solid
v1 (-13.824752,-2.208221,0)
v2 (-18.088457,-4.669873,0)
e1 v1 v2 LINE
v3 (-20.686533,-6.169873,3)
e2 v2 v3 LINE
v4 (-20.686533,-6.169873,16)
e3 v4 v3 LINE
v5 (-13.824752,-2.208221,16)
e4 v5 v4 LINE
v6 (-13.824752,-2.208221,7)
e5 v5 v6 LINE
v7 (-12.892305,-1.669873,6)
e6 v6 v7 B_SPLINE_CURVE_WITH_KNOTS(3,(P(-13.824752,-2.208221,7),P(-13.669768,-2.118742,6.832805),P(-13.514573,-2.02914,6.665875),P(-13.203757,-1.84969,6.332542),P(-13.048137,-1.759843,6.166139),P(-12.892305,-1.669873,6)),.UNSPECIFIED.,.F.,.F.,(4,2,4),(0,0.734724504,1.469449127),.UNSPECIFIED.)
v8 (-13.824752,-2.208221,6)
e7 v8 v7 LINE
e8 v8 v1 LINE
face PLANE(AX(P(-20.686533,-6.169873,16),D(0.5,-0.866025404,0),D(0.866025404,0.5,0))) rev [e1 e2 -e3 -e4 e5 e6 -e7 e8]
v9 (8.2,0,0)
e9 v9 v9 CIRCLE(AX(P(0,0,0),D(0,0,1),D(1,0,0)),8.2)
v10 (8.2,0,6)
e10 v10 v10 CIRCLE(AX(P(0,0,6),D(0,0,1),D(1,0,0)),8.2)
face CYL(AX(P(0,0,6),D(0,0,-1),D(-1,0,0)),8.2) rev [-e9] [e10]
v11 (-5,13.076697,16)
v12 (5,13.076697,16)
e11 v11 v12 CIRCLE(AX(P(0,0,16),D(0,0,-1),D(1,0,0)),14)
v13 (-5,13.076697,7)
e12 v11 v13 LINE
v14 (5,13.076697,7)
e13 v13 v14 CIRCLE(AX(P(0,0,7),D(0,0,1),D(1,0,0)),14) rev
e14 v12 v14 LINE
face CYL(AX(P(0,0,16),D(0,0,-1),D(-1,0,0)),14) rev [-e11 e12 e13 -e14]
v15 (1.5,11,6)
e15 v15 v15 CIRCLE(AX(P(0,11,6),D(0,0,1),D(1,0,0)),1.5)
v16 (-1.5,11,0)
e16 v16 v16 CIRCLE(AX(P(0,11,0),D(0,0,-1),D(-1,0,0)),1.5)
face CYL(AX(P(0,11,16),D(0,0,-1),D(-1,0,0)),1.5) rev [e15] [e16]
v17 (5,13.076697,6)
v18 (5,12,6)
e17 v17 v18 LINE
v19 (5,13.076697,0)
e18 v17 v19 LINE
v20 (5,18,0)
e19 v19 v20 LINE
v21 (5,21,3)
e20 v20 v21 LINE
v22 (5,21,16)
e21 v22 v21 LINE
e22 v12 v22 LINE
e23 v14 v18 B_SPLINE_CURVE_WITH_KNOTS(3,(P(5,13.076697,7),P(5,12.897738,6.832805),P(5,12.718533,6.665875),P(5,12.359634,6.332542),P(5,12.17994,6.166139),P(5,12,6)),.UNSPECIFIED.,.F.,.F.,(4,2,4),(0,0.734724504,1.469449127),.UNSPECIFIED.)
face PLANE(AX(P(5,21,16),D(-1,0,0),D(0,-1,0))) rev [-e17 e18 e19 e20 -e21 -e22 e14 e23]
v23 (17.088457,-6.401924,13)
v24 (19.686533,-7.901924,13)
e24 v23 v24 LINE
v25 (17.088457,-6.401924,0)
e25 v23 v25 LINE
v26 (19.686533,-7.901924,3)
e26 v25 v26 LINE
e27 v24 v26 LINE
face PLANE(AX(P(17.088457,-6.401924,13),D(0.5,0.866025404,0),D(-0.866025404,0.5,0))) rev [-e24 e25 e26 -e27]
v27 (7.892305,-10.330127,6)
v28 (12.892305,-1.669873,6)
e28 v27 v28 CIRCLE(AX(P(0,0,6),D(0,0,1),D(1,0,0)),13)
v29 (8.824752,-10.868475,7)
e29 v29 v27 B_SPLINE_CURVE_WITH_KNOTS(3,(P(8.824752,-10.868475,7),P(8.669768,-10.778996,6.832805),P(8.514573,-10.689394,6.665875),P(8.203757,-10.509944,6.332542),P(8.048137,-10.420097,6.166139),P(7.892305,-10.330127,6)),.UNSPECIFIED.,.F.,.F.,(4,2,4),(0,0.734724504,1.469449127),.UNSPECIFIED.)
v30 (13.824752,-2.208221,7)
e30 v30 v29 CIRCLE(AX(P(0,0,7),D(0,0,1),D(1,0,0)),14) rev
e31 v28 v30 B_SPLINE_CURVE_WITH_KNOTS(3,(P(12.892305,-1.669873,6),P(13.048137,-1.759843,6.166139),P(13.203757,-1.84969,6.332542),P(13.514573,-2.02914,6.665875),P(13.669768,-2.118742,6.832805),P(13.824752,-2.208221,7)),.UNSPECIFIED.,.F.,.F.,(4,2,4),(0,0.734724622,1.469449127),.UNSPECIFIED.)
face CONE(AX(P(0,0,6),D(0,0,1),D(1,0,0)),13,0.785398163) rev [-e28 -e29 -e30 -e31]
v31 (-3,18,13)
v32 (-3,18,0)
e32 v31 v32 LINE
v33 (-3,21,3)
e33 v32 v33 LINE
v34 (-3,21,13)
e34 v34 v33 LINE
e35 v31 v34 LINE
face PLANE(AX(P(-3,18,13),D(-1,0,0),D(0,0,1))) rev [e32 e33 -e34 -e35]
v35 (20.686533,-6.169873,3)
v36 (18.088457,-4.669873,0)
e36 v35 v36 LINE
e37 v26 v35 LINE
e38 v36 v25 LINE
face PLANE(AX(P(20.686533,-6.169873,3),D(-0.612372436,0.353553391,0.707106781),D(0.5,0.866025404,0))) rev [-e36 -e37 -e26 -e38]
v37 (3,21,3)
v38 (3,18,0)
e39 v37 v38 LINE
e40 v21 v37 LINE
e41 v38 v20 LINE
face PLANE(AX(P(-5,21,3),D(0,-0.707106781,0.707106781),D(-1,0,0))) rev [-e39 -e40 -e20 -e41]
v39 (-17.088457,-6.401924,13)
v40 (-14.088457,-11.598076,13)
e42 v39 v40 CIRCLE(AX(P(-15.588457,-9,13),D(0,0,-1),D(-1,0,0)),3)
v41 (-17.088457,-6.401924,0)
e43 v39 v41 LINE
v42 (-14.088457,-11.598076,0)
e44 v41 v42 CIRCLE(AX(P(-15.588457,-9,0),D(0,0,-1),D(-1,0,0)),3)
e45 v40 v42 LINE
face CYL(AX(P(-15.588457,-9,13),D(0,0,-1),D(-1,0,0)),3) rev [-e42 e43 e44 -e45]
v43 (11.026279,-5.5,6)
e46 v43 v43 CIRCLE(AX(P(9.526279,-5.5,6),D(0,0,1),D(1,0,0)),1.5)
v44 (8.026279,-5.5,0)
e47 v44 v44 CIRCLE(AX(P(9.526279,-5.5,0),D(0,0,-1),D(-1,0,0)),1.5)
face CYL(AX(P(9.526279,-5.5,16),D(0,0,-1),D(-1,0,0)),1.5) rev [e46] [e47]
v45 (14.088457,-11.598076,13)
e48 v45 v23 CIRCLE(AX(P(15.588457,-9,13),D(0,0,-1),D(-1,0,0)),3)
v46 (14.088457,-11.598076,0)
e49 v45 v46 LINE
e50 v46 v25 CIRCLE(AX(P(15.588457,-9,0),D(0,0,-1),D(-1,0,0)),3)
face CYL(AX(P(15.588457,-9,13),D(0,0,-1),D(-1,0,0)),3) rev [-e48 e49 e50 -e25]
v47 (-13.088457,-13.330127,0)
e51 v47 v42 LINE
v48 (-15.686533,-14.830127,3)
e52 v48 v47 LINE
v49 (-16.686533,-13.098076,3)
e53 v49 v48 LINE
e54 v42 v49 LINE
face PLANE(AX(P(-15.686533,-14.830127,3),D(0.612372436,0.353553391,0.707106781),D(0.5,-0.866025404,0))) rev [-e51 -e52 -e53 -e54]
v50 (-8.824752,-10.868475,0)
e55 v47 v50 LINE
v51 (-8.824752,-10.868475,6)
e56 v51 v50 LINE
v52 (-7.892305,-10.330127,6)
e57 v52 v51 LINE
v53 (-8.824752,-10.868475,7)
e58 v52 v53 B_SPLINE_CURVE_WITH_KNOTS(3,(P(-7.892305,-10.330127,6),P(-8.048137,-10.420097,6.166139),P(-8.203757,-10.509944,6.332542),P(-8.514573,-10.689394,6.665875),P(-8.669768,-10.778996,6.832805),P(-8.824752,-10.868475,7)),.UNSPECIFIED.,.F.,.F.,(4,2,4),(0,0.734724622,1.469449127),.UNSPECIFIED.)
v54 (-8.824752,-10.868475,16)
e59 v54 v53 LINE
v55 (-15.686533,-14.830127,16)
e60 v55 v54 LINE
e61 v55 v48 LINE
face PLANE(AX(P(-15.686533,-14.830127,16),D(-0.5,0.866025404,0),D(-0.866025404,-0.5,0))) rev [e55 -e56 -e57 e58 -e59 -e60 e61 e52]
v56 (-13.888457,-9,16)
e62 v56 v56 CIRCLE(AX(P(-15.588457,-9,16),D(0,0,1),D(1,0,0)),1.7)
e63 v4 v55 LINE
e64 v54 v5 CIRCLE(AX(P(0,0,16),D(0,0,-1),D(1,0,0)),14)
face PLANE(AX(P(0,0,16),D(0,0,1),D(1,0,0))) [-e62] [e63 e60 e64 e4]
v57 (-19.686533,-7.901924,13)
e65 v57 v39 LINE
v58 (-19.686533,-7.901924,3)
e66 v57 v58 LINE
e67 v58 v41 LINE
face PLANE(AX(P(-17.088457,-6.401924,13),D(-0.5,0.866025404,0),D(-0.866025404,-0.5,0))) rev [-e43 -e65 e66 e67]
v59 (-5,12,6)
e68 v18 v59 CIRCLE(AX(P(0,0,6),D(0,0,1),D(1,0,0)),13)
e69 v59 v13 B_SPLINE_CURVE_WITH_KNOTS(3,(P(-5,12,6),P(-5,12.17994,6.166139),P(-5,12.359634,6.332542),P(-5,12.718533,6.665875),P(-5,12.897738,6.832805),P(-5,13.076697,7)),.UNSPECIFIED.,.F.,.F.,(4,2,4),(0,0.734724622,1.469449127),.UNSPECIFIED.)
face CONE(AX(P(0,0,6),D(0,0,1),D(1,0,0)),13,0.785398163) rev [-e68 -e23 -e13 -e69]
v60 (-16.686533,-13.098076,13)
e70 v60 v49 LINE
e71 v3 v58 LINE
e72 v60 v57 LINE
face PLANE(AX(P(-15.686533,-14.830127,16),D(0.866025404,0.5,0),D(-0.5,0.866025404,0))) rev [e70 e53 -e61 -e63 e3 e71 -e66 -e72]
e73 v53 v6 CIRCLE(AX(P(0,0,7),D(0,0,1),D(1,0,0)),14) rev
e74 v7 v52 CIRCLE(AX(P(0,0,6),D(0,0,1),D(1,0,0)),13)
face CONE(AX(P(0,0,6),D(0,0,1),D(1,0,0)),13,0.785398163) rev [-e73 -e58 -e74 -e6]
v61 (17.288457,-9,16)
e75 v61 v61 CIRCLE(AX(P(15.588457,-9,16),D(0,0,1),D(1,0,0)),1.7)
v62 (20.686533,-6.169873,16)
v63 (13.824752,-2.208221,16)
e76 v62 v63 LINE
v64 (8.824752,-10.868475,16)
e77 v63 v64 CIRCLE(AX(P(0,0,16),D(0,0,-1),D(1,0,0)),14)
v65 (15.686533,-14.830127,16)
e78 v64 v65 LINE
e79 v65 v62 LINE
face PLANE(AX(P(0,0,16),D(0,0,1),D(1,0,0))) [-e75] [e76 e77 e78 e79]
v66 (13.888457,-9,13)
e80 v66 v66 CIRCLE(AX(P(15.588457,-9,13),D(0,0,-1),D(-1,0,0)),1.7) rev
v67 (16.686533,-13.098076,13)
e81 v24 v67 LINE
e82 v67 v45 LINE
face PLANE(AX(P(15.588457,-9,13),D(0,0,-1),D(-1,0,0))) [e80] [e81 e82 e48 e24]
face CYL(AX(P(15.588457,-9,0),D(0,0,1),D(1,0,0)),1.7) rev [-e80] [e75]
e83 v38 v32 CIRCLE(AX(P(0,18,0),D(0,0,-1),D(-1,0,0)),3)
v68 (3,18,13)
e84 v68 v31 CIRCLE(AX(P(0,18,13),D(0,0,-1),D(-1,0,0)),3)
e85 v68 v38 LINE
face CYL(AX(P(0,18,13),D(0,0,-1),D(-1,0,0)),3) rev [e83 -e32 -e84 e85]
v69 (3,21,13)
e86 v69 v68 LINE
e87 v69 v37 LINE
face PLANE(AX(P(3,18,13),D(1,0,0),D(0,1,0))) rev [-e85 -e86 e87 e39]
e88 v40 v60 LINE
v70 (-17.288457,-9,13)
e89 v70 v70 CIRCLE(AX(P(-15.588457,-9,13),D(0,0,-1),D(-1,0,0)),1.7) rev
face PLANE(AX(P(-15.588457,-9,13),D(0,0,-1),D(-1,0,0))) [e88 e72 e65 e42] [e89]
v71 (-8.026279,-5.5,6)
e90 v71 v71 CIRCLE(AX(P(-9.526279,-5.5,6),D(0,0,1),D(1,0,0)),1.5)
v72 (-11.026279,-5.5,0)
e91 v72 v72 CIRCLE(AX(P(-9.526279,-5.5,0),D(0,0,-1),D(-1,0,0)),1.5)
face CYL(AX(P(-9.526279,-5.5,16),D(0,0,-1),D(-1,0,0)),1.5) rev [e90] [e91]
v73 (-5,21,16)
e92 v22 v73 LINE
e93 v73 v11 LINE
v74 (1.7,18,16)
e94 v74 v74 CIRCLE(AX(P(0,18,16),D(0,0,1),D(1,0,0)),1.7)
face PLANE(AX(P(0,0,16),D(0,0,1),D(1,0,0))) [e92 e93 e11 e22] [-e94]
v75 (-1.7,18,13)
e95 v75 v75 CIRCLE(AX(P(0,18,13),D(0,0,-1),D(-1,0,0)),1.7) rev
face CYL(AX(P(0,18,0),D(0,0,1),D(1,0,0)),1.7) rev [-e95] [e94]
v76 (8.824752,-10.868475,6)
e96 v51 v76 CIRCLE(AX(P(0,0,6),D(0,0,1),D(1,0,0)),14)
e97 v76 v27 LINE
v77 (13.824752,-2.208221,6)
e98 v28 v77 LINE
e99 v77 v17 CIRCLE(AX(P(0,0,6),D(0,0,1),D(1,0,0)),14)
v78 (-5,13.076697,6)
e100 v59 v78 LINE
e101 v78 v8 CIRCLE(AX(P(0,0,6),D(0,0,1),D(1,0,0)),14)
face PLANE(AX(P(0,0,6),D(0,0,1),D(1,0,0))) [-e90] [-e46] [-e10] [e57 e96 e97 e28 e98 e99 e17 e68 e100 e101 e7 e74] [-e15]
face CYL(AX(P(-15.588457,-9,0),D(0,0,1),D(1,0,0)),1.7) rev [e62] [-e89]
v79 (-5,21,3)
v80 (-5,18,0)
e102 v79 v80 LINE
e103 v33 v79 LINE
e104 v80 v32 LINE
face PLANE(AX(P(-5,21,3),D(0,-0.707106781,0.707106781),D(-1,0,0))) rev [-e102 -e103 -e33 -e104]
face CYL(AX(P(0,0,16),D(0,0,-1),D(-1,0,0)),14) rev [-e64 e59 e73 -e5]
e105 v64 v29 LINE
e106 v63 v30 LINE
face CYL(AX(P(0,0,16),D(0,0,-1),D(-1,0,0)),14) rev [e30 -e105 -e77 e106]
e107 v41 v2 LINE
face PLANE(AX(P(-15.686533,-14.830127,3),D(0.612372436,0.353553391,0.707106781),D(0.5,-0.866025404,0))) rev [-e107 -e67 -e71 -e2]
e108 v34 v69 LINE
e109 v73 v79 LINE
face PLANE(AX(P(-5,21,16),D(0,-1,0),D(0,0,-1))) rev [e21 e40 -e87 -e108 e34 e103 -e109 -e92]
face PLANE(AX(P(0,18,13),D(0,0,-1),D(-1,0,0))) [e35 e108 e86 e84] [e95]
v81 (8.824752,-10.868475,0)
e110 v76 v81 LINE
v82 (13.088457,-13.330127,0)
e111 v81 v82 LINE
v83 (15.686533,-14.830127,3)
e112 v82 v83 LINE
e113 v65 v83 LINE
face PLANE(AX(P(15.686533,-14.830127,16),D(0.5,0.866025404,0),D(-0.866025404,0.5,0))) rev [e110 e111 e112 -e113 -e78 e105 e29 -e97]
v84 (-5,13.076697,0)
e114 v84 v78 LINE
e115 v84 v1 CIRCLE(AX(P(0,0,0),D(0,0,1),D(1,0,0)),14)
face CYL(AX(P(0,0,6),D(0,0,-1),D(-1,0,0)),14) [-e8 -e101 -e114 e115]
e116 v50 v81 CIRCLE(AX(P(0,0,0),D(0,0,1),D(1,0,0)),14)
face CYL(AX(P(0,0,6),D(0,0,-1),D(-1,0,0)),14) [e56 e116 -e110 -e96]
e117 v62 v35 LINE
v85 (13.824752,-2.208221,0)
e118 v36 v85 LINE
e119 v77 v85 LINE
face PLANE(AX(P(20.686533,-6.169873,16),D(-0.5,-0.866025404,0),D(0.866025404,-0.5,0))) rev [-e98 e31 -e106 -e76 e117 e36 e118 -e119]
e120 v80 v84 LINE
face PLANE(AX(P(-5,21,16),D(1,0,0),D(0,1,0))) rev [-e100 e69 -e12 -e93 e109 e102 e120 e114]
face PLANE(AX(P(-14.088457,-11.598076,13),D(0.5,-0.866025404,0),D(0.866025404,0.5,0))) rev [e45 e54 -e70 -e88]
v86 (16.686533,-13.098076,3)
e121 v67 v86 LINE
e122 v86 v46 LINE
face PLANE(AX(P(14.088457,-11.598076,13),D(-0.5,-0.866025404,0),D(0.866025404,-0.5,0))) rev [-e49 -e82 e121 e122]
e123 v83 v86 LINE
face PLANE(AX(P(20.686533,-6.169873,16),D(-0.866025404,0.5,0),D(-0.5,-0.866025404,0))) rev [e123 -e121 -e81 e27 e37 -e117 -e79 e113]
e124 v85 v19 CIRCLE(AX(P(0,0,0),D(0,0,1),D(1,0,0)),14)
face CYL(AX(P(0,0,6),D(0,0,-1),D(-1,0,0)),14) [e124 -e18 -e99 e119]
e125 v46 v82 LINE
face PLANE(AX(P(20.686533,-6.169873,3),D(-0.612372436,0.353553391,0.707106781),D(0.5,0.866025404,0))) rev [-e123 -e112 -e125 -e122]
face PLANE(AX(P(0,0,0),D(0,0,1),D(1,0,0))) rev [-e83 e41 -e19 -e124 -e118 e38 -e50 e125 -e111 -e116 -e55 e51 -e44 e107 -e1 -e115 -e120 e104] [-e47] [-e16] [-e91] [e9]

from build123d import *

# Parameters (mm, degrees)
SKETCH_1_R          = 14
SKETCH_1_R_2        = 8.2
EXTRUDE_1_DEPTH     = 6
EXTRUDE_2_DEPTH     = 16
SKETCH_3_R          = 1.7
CUT_EXTRUDE_1_DEPTH = 34.540015912
SKETCH_4_R          = 1.5
CUT_EXTRUDE_2_DEPTH = 34.540015912
CUT_EXTRUDE_3_DEPTH = 13
CHAMFER_1_SIZE      = 3
CHAMFER_2_SIZE      = 1


with BuildPart() as part:
    # 草圖1 → 填料-伸長1 (new body)
    with BuildSketch(Plane.XY):
        Circle(SKETCH_1_R)
        Circle(SKETCH_1_R_2, mode=Mode.SUBTRACT)
    extrude(amount=EXTRUDE_1_DEPTH)

    # 草圖2 → 填料-伸長2 (add)
    with BuildSketch(Plane.XY):
        with BuildLine():
            Line((20.686533479, -6.169872981), (13.824751653, -2.208221396))
            ThreePointArc((13.824751653, -2.208221396), (12.124355653, -7), (8.824751653, -10.868475434))
            Line((8.824751653, -10.868475434), (15.686533479, -14.830127019))
            Line((15.686533479, -14.830127019), (20.686533479, -6.169872981))
        make_face()
        with BuildLine():
            Line((-5, 21), (5, 21))
            Line((5, 21), (5, 13.076696831))
            ThreePointArc((5, 13.076696831), (0, 14), (-5, 13.076696831))
            Line((-5, 13.076696831), (-5, 21))
        make_face()
        with BuildLine():
            Line((-15.686533479, -14.830127019), (-8.824751653, -10.868475434))
            ThreePointArc((-8.824751653, -10.868475434), (-12.124355653, -7), (-13.824751653, -2.208221396))
            Line((-13.824751653, -2.208221396), (-20.686533479, -6.169872981))
            Line((-20.686533479, -6.169872981), (-15.686533479, -14.830127019))
        make_face()
    extrude(amount=EXTRUDE_2_DEPTH)

    # 草圖3 → 除料-伸長1 (cut, through all)
    with BuildSketch(Plane.XY.offset(16)):
        with Locations((0, 18)):
            Circle(SKETCH_3_R)
        with Locations((15.588457268, -9)):
            Circle(SKETCH_3_R)
        with Locations((-15.588457268, -9)):
            Circle(SKETCH_3_R)
    extrude(amount=-CUT_EXTRUDE_1_DEPTH, mode=Mode.SUBTRACT)

    # 草圖4 → 除料-伸長2 (cut, through all)
    with BuildSketch(Plane(origin=(0, 0, 0), x_dir=(-1, 0, 0), z_dir=(0, 0, -1))):
        with Locations((0, 11)):
            Circle(SKETCH_4_R)
        with Locations((9.526279442, -5.5)):
            Circle(SKETCH_4_R)
        with Locations((-9.526279442, -5.5)):
            Circle(SKETCH_4_R)
    extrude(amount=-CUT_EXTRUDE_2_DEPTH, mode=Mode.SUBTRACT)

    # 草圖5 → 除料-伸長3 (cut)
    with BuildSketch(Plane(origin=(0, 0, 0), x_dir=(-1, 0, 0), z_dir=(0, 0, -1))):
        with BuildLine():
            Line((17.088457268, -6.401923789), (19.686533479, -7.901923789))
            Line((19.686533479, -7.901923789), (16.686533479, -13.098076211))
            Line((16.686533479, -13.098076211), (14.088457268, -11.598076211))
            ThreePointArc((14.088457268, -11.598076211), (12.990381057, -7.5), (17.088457268, -6.401923789))
        make_face()
        with BuildLine():
            Line((-3, 18), (-3, 21))
            Line((-3, 21), (3, 21))
            Line((3, 21), (3, 18))
            ThreePointArc((3, 18), (0, 15), (-3, 18))
        make_face()
        with BuildLine():
            Line((-14.088457268, -11.598076211), (-16.686533479, -13.098076211))
            Line((-16.686533479, -13.098076211), (-19.686533479, -7.901923789))
            Line((-19.686533479, -7.901923789), (-17.088457268, -6.401923789))
            ThreePointArc((-17.088457268, -6.401923789), (-12.990381057, -7.5), (-14.088457268, -11.598076211))
        make_face()
    extrude(amount=-CUT_EXTRUDE_3_DEPTH, mode=Mode.SUBTRACT)

    # 導角1
    chamfer_1_edges = [part.edges().sort_by_distance(p)[0] for p in [
        (4, 21, 0),
        (-4, 21, 0),
        (-20.186533479, -7.035898385, 0),
        (-16.186533479, -13.964101615, 0),
        (20.186533479, -7.035898385, 0),
        (16.186533479, -13.964101615, 0),
    ]]
    chamfer(chamfer_1_edges, length=CHAMFER_1_SIZE)

    # 導角2
    # the kernel refuses this chamfer: 1 mm, written as the material it adds along each edge
    with BuildSketch(Plane(origin=(0, 0, 6), x_dir=(0.4779177917946843, -0.8784045675462375, 0), z_dir=(-0.8784045675462375, -0.4779177917946843, 0))) as chamfer_2_piece_1_section:
        Polygon((14 - CHAMFER_2_SIZE, 0), (14, CHAMFER_2_SIZE), (14, 0), align=None)
    chamfer_2_piece_1 = revolve(axis=Axis((0, 0, 6), (0, 0, 1)), revolution_arc=62.901004407, mode=Mode.PRIVATE)
    chamfer_2_piece_1 = split(chamfer_2_piece_1, bisect_by=Plane(origin=(14.060598585, -2.344387686, 6.333230846), z_dir=(-0.5000000000000002, -0.8660254037844386, 0)), keep=Keep.TOP, mode=Mode.PRIVATE)
    chamfer_2_piece_1 = split(chamfer_2_piece_1, bisect_by=Plane(origin=(9.060598585, -11.004641724, 6.333230846), z_dir=(0.49999999999999956, 0.8660254037844389, 0)), keep=Keep.TOP, mode=Mode.PRIVATE)
    add(chamfer_2_piece_1)
    with BuildSketch(Plane(origin=(0, 0, 6), x_dir=(-0.9996795661926668, 0.025313335158395317, 0), z_dir=(0.025313335158395317, 0.9996795661926668, 0))) as chamfer_2_piece_2_section:
        Polygon((14 - CHAMFER_2_SIZE, 0), (14, CHAMFER_2_SIZE), (14, 0), align=None)
    chamfer_2_piece_2 = revolve(axis=Axis((0, 0, 6), (0, 0, 1)), revolution_arc=62.901004407, mode=Mode.PRIVATE)
    chamfer_2_piece_2 = split(chamfer_2_piece_2, bisect_by=Plane(origin=(-14.060598585, -2.344387686, 6.333230846), z_dir=(0.5000000000000009, -0.8660254037844383, 0)), keep=Keep.TOP, mode=Mode.PRIVATE)
    chamfer_2_piece_2 = split(chamfer_2_piece_2, bisect_by=Plane(origin=(-9.060598585, -11.004641724, 6.333230846), z_dir=(-0.5000000000000003, 0.8660254037844387, 0)), keep=Keep.TOP, mode=Mode.PRIVATE)
    add(chamfer_2_piece_2)
    with BuildSketch(Plane(origin=(0, 0, 6), x_dir=(0.5217617743979716, 0.853091232387885, 0), z_dir=(0.853091232387885, -0.5217617743979716, 0))) as chamfer_2_piece_3_section:
        Polygon((14, CHAMFER_2_SIZE), (14 - CHAMFER_2_SIZE, 0), (14, 0), align=None)
    chamfer_2_piece_3 = revolve(axis=Axis((0, 0, 6), (0, 0, 1)), revolution_arc=62.901004407, mode=Mode.PRIVATE)
    chamfer_2_piece_3 = split(chamfer_2_piece_3, bisect_by=Plane(origin=(5, 13.34902941, 6.333230846), z_dir=(-1, 0, 0)), keep=Keep.TOP, mode=Mode.PRIVATE)
    chamfer_2_piece_3 = split(chamfer_2_piece_3, bisect_by=Plane(origin=(-5, 13.34902941, 6.333230846), z_dir=(1, 0, 0)), keep=Keep.TOP, mode=Mode.PRIVATE)
    add(chamfer_2_piece_3)


solid = part.part
